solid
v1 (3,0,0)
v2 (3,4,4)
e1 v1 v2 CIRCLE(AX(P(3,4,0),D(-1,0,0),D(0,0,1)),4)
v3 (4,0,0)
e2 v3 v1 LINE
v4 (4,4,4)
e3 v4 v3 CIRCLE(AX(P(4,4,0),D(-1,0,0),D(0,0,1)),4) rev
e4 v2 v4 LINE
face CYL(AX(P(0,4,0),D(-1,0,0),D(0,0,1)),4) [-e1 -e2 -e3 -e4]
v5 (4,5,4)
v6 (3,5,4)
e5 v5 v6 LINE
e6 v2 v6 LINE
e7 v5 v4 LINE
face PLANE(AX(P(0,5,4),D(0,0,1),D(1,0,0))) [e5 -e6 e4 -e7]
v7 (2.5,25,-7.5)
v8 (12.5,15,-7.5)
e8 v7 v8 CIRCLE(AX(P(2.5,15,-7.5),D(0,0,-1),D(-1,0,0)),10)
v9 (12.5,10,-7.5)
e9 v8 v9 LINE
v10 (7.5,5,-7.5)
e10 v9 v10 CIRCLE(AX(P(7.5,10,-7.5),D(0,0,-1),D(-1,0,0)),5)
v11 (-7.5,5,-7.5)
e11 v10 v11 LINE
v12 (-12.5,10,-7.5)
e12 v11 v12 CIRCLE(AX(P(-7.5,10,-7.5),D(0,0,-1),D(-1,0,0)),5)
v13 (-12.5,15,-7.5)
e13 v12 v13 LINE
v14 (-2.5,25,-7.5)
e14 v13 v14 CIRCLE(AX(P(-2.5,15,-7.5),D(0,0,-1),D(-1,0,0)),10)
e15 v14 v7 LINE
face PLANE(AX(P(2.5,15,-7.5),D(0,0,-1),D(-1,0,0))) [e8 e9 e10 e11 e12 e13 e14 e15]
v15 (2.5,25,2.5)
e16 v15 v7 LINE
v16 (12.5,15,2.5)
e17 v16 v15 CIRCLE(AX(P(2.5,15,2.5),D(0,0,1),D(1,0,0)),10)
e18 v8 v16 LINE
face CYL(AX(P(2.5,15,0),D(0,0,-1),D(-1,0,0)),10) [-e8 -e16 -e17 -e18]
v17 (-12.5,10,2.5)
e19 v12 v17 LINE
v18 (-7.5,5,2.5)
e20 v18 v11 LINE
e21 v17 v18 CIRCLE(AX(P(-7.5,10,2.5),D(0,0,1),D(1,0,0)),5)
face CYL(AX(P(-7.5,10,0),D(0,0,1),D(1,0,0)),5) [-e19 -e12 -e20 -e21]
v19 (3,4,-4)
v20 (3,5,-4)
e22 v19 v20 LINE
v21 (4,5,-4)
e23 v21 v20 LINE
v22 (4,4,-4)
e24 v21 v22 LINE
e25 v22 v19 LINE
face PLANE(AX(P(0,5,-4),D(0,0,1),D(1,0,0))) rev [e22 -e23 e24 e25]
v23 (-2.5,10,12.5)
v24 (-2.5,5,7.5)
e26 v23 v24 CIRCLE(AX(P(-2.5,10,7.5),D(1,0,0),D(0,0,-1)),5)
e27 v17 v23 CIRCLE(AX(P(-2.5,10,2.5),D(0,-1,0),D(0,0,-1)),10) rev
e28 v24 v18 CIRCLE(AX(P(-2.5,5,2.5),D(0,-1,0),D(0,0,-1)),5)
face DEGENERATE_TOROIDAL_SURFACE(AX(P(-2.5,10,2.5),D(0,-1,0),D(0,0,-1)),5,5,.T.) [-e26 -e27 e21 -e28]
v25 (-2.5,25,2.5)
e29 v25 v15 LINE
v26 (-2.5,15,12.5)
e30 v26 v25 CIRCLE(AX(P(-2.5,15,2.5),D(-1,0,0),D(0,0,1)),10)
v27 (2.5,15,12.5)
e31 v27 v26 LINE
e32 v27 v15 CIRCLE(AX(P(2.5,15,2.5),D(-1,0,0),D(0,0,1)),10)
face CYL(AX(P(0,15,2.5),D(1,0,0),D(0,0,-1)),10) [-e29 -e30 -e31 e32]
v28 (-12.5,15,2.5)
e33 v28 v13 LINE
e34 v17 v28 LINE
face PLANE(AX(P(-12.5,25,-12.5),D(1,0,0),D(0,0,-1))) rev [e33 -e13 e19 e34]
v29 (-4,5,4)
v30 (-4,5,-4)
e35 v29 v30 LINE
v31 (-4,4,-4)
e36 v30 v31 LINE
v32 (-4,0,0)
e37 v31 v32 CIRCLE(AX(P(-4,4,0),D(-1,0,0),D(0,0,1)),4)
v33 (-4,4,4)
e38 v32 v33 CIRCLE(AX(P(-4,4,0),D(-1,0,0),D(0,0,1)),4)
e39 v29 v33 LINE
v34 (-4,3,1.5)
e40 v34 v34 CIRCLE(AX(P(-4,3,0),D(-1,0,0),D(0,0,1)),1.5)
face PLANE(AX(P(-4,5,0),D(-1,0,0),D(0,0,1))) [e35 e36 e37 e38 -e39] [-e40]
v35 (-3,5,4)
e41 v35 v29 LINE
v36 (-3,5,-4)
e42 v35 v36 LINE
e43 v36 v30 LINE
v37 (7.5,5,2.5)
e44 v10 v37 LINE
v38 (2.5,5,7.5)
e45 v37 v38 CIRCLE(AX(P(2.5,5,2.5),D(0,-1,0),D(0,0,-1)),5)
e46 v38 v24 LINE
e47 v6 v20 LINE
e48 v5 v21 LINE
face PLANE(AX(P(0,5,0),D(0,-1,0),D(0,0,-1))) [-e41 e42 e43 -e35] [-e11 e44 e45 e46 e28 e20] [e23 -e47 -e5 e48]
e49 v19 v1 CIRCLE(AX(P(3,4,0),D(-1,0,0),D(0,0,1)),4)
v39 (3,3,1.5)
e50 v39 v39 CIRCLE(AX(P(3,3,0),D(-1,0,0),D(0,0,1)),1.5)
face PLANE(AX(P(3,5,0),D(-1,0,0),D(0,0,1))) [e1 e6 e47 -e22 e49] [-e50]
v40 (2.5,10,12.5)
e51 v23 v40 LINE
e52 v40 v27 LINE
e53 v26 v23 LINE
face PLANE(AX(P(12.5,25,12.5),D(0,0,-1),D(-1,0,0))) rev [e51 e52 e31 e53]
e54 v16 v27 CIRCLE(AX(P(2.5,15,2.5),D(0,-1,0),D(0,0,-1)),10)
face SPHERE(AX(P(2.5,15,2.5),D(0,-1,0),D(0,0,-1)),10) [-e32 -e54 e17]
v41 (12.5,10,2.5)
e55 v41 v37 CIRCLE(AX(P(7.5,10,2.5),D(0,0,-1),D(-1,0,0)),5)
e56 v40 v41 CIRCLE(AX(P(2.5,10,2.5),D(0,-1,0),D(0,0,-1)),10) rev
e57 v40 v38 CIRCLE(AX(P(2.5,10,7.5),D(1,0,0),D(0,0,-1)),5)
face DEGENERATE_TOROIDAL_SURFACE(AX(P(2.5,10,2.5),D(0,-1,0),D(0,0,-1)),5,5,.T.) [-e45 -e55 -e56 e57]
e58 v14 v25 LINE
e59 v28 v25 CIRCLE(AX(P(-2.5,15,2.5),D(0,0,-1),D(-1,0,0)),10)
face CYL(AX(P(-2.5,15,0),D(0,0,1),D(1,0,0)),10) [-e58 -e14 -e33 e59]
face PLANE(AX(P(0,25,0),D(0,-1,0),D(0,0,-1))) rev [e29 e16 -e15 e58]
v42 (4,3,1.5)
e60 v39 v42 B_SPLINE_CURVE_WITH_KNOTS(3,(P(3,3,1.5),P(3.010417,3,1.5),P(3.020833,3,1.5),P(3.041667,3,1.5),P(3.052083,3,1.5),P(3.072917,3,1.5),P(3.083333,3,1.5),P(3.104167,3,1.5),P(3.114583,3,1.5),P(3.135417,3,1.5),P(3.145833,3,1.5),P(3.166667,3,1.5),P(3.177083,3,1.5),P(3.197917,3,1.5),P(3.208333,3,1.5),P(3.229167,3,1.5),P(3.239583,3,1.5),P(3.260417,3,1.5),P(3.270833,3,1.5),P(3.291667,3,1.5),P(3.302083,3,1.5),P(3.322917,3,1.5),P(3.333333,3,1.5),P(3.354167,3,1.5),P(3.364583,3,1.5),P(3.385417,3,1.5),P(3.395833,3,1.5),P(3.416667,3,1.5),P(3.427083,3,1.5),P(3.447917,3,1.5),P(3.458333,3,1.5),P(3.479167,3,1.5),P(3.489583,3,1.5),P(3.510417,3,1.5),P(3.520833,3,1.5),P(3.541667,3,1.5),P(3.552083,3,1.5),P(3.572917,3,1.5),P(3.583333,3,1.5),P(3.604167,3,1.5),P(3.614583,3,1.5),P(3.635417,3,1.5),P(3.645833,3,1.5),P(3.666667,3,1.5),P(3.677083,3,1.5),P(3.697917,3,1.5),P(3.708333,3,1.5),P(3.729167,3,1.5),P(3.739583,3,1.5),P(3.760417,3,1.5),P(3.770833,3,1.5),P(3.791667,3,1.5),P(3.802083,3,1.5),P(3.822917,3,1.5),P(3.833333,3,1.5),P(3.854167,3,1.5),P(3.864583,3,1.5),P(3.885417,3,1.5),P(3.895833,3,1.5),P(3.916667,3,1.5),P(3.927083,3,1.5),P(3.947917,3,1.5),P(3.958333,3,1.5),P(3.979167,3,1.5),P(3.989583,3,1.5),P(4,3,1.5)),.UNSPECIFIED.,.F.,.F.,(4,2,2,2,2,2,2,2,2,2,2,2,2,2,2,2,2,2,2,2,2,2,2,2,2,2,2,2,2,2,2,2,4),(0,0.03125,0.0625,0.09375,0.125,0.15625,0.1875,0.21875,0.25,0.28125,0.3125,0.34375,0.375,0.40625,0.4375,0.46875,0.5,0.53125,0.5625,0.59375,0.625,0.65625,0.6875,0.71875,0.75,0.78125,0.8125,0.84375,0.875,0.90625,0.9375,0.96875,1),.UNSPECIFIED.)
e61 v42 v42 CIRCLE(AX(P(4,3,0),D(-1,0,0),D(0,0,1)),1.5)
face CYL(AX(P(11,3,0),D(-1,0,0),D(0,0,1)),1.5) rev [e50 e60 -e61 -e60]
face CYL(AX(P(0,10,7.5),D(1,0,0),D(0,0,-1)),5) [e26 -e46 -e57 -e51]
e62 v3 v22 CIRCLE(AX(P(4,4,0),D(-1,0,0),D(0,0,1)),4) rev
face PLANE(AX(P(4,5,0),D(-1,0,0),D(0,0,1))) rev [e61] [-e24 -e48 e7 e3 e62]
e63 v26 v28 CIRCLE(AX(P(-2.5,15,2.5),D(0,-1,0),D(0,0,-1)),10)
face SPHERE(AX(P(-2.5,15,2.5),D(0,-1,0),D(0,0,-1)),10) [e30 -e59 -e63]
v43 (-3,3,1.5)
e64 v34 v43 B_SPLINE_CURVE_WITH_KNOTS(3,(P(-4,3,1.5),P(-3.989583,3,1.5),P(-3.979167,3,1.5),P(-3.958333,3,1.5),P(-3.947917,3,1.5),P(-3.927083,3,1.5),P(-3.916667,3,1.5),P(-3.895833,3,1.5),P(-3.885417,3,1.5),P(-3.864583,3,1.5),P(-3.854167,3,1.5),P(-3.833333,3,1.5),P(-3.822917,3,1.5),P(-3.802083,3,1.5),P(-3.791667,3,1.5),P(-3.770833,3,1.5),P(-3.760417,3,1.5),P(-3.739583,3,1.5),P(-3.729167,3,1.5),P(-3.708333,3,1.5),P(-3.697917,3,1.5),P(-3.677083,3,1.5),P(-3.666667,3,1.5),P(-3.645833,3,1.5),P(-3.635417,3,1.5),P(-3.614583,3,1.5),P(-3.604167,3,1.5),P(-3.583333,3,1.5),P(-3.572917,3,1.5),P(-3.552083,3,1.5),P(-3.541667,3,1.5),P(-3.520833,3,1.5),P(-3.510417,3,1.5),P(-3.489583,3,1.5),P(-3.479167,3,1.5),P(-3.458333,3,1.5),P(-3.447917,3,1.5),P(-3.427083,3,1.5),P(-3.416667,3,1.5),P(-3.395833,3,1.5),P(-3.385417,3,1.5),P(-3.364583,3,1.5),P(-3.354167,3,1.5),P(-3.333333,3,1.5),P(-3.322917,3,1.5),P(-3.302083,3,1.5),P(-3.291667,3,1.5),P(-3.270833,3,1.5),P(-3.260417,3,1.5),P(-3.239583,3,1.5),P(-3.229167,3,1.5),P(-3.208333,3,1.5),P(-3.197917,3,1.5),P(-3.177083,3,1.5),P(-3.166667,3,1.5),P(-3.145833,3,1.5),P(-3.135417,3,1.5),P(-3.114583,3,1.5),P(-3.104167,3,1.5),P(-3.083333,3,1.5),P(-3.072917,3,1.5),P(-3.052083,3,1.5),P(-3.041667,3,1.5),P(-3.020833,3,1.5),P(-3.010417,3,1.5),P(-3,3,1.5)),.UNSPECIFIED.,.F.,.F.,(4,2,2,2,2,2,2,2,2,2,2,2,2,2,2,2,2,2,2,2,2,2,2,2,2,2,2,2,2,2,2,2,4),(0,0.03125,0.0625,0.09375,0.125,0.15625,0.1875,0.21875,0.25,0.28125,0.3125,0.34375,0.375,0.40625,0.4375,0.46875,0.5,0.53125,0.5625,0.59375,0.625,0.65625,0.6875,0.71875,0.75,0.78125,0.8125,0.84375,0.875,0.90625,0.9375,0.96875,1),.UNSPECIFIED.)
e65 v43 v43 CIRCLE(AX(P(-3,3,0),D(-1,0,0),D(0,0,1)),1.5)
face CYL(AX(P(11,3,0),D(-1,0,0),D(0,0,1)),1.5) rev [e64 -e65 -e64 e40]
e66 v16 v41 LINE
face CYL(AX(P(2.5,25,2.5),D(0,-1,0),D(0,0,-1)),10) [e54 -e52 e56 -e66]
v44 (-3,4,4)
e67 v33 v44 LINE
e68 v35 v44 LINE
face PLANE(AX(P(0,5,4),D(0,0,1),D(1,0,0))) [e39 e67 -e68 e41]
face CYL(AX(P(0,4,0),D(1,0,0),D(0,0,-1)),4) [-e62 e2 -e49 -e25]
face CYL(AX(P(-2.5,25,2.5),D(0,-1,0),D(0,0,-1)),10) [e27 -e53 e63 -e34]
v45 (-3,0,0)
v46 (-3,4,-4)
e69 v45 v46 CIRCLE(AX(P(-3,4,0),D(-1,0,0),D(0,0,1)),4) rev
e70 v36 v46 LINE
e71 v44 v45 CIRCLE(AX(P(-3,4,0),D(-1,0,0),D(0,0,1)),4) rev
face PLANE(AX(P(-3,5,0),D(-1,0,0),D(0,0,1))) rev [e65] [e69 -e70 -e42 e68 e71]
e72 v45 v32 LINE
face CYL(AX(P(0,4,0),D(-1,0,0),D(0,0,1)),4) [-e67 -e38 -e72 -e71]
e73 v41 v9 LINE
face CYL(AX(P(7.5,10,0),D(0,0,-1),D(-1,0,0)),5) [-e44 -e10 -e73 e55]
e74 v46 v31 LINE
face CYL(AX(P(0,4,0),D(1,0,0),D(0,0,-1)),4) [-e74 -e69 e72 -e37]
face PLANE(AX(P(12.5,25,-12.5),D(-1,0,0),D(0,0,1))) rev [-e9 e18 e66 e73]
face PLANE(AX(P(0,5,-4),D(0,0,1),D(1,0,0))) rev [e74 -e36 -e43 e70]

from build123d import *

# Parameters (mm, degrees)
SKETCH2_W           = 25
SKETCH2_H           = 25
BOSS_EXTRUDE1_DEPTH = 25
FILLET2_R           = 10
FILLET3_R           = 10
CUT_EXTRUDE1_START  = -5
SKETCH3_W           = 8
SKETCH3_H           = 8
SKETCH3_W_2         = 6
SKETCH3_H_2         = 6
CUT_EXTRUDE1_DEPTH  = 5
FILLET5_R           = 5
CUT_EXTRUDE2_DEPTH  = 5
FILLET6_R           = 4
SKETCH6_R           = 1.5
CUT_EXTRUDE3_DEPTH  = 15
CUT_EXTRUDE4_DEPTH  = 5


with BuildPart() as part:
    # Sketch2 → Boss-Extrude1 (new body)
    with BuildSketch(Plane(origin=(0, 0, 0), x_dir=(1, 0, 0), z_dir=(0, 1, 0))):
        Rectangle(SKETCH2_W, SKETCH2_H)
    extrude(amount=BOSS_EXTRUDE1_DEPTH)

    # Fillet2
    fillet2_edges = [part.edges().sort_by_distance(p)[0] for p in [
        (12.5, 12.5, 12.5),
        (-12.5, 12.5, 12.5),
    ]]
    fillet(fillet2_edges, radius=FILLET2_R)

    # Fillet3
    fillet3_edges = [part.edges().sort_by_distance(p)[0] for p in [
        (0, 25, 12.5),
        (12.5, 25, -5),
        (9.571067812, 25, 9.571067812),
        (-9.571067812, 25, 9.571067812),
        (-12.5, 25, -5),
    ]]
    fillet(fillet3_edges, radius=FILLET3_R)

    # Sketch3 → Cut-Extrude1 (cut)
    # profile 1 of 2: a face of its own
    with BuildSketch(Plane.XZ.offset(CUT_EXTRUDE1_START)):
        with BuildLine():
            ThreePointArc((12.5, 2.5), (9.571067812, 9.571067812), (2.5, 12.5))
            Line((2.5, 12.5), (-2.5, 12.5))
            ThreePointArc((-2.5, 12.5), (-9.571067812, 9.571067812), (-12.5, 2.5))
            Line((-12.5, 2.5), (-12.5, -12.5))
            Line((-12.5, -12.5), (12.5, -12.5))
            Line((12.5, -12.5), (12.5, 2.5))
        make_face()
        Rectangle(SKETCH3_W, SKETCH3_H, mode=Mode.SUBTRACT)
    # profile 2 of 2: a face of its own
    with BuildSketch(Plane.XZ.offset(CUT_EXTRUDE1_START)):
        Rectangle(SKETCH3_W_2, SKETCH3_H_2)
    extrude(amount=CUT_EXTRUDE1_DEPTH, mode=Mode.SUBTRACT)

    # Fillet5
    fillet5_edges = [part.edges().sort_by_distance(p)[0] for p in [
        (9.571067812, 5, 9.571067812),
        (12.5, 5, -5),
        (-12.5, 5, -5),
        (-9.571067812, 5, 9.571067812),
        (0, 5, 12.5),
    ]]
    fillet(fillet5_edges, radius=FILLET5_R)

    # Sketch5 → Cut-Extrude2 (cut)
    with BuildSketch(Plane.XZ):
        Polygon((-3, 3), (-3, 4.768124317), (3, 4.768124317), (3, -4.905831879), (-3, -4.905831879), align=None)
    extrude(amount=-CUT_EXTRUDE2_DEPTH, mode=Mode.SUBTRACT)

    # Fillet6
    fillet6_edges = [part.edges().sort_by_distance(p)[0] for p in [
        (3.5, 0, -4),
        (3.5, 0, 4),
        (-3.5, 0, -4),
        (-3.5, 0, 4),
    ]]
    fillet(fillet6_edges, radius=FILLET6_R - 0.0001)  # a hair under: the kernel refuses the full size

    # Sketch6 → Cut-Extrude3 (cut)
    with BuildSketch(Plane.ZY.offset(4)):
        with Locations((0, 3)):
            Circle(SKETCH6_R)
    extrude(amount=-CUT_EXTRUDE3_DEPTH, mode=Mode.SUBTRACT)

    # Sketch7 → Cut-Extrude4 (cut)
    with BuildSketch(Plane(origin=(0, 0, -12.5), x_dir=(-1, 0, 0), z_dir=(0, 0, -1))):
        with BuildLine():
            Line((-12.5, 15), (-12.5, 10))
            ThreePointArc((-12.5, 10), (-11.035533906, 6.464466094), (-7.5, 5))
            Line((-7.5, 5), (7.5, 5))
            ThreePointArc((7.5, 5), (11.035533906, 6.464466094), (12.5, 10))
            Line((12.5, 10), (12.5, 15))
            ThreePointArc((12.5, 15), (9.571067812, 22.071067812), (2.5, 25))
            Line((2.5, 25), (-2.5, 25))
            ThreePointArc((-2.5, 25), (-9.571067812, 22.071067812), (-12.5, 15))
        make_face()
    extrude(amount=-CUT_EXTRUDE4_DEPTH, mode=Mode.SUBTRACT)


solid = part.part
